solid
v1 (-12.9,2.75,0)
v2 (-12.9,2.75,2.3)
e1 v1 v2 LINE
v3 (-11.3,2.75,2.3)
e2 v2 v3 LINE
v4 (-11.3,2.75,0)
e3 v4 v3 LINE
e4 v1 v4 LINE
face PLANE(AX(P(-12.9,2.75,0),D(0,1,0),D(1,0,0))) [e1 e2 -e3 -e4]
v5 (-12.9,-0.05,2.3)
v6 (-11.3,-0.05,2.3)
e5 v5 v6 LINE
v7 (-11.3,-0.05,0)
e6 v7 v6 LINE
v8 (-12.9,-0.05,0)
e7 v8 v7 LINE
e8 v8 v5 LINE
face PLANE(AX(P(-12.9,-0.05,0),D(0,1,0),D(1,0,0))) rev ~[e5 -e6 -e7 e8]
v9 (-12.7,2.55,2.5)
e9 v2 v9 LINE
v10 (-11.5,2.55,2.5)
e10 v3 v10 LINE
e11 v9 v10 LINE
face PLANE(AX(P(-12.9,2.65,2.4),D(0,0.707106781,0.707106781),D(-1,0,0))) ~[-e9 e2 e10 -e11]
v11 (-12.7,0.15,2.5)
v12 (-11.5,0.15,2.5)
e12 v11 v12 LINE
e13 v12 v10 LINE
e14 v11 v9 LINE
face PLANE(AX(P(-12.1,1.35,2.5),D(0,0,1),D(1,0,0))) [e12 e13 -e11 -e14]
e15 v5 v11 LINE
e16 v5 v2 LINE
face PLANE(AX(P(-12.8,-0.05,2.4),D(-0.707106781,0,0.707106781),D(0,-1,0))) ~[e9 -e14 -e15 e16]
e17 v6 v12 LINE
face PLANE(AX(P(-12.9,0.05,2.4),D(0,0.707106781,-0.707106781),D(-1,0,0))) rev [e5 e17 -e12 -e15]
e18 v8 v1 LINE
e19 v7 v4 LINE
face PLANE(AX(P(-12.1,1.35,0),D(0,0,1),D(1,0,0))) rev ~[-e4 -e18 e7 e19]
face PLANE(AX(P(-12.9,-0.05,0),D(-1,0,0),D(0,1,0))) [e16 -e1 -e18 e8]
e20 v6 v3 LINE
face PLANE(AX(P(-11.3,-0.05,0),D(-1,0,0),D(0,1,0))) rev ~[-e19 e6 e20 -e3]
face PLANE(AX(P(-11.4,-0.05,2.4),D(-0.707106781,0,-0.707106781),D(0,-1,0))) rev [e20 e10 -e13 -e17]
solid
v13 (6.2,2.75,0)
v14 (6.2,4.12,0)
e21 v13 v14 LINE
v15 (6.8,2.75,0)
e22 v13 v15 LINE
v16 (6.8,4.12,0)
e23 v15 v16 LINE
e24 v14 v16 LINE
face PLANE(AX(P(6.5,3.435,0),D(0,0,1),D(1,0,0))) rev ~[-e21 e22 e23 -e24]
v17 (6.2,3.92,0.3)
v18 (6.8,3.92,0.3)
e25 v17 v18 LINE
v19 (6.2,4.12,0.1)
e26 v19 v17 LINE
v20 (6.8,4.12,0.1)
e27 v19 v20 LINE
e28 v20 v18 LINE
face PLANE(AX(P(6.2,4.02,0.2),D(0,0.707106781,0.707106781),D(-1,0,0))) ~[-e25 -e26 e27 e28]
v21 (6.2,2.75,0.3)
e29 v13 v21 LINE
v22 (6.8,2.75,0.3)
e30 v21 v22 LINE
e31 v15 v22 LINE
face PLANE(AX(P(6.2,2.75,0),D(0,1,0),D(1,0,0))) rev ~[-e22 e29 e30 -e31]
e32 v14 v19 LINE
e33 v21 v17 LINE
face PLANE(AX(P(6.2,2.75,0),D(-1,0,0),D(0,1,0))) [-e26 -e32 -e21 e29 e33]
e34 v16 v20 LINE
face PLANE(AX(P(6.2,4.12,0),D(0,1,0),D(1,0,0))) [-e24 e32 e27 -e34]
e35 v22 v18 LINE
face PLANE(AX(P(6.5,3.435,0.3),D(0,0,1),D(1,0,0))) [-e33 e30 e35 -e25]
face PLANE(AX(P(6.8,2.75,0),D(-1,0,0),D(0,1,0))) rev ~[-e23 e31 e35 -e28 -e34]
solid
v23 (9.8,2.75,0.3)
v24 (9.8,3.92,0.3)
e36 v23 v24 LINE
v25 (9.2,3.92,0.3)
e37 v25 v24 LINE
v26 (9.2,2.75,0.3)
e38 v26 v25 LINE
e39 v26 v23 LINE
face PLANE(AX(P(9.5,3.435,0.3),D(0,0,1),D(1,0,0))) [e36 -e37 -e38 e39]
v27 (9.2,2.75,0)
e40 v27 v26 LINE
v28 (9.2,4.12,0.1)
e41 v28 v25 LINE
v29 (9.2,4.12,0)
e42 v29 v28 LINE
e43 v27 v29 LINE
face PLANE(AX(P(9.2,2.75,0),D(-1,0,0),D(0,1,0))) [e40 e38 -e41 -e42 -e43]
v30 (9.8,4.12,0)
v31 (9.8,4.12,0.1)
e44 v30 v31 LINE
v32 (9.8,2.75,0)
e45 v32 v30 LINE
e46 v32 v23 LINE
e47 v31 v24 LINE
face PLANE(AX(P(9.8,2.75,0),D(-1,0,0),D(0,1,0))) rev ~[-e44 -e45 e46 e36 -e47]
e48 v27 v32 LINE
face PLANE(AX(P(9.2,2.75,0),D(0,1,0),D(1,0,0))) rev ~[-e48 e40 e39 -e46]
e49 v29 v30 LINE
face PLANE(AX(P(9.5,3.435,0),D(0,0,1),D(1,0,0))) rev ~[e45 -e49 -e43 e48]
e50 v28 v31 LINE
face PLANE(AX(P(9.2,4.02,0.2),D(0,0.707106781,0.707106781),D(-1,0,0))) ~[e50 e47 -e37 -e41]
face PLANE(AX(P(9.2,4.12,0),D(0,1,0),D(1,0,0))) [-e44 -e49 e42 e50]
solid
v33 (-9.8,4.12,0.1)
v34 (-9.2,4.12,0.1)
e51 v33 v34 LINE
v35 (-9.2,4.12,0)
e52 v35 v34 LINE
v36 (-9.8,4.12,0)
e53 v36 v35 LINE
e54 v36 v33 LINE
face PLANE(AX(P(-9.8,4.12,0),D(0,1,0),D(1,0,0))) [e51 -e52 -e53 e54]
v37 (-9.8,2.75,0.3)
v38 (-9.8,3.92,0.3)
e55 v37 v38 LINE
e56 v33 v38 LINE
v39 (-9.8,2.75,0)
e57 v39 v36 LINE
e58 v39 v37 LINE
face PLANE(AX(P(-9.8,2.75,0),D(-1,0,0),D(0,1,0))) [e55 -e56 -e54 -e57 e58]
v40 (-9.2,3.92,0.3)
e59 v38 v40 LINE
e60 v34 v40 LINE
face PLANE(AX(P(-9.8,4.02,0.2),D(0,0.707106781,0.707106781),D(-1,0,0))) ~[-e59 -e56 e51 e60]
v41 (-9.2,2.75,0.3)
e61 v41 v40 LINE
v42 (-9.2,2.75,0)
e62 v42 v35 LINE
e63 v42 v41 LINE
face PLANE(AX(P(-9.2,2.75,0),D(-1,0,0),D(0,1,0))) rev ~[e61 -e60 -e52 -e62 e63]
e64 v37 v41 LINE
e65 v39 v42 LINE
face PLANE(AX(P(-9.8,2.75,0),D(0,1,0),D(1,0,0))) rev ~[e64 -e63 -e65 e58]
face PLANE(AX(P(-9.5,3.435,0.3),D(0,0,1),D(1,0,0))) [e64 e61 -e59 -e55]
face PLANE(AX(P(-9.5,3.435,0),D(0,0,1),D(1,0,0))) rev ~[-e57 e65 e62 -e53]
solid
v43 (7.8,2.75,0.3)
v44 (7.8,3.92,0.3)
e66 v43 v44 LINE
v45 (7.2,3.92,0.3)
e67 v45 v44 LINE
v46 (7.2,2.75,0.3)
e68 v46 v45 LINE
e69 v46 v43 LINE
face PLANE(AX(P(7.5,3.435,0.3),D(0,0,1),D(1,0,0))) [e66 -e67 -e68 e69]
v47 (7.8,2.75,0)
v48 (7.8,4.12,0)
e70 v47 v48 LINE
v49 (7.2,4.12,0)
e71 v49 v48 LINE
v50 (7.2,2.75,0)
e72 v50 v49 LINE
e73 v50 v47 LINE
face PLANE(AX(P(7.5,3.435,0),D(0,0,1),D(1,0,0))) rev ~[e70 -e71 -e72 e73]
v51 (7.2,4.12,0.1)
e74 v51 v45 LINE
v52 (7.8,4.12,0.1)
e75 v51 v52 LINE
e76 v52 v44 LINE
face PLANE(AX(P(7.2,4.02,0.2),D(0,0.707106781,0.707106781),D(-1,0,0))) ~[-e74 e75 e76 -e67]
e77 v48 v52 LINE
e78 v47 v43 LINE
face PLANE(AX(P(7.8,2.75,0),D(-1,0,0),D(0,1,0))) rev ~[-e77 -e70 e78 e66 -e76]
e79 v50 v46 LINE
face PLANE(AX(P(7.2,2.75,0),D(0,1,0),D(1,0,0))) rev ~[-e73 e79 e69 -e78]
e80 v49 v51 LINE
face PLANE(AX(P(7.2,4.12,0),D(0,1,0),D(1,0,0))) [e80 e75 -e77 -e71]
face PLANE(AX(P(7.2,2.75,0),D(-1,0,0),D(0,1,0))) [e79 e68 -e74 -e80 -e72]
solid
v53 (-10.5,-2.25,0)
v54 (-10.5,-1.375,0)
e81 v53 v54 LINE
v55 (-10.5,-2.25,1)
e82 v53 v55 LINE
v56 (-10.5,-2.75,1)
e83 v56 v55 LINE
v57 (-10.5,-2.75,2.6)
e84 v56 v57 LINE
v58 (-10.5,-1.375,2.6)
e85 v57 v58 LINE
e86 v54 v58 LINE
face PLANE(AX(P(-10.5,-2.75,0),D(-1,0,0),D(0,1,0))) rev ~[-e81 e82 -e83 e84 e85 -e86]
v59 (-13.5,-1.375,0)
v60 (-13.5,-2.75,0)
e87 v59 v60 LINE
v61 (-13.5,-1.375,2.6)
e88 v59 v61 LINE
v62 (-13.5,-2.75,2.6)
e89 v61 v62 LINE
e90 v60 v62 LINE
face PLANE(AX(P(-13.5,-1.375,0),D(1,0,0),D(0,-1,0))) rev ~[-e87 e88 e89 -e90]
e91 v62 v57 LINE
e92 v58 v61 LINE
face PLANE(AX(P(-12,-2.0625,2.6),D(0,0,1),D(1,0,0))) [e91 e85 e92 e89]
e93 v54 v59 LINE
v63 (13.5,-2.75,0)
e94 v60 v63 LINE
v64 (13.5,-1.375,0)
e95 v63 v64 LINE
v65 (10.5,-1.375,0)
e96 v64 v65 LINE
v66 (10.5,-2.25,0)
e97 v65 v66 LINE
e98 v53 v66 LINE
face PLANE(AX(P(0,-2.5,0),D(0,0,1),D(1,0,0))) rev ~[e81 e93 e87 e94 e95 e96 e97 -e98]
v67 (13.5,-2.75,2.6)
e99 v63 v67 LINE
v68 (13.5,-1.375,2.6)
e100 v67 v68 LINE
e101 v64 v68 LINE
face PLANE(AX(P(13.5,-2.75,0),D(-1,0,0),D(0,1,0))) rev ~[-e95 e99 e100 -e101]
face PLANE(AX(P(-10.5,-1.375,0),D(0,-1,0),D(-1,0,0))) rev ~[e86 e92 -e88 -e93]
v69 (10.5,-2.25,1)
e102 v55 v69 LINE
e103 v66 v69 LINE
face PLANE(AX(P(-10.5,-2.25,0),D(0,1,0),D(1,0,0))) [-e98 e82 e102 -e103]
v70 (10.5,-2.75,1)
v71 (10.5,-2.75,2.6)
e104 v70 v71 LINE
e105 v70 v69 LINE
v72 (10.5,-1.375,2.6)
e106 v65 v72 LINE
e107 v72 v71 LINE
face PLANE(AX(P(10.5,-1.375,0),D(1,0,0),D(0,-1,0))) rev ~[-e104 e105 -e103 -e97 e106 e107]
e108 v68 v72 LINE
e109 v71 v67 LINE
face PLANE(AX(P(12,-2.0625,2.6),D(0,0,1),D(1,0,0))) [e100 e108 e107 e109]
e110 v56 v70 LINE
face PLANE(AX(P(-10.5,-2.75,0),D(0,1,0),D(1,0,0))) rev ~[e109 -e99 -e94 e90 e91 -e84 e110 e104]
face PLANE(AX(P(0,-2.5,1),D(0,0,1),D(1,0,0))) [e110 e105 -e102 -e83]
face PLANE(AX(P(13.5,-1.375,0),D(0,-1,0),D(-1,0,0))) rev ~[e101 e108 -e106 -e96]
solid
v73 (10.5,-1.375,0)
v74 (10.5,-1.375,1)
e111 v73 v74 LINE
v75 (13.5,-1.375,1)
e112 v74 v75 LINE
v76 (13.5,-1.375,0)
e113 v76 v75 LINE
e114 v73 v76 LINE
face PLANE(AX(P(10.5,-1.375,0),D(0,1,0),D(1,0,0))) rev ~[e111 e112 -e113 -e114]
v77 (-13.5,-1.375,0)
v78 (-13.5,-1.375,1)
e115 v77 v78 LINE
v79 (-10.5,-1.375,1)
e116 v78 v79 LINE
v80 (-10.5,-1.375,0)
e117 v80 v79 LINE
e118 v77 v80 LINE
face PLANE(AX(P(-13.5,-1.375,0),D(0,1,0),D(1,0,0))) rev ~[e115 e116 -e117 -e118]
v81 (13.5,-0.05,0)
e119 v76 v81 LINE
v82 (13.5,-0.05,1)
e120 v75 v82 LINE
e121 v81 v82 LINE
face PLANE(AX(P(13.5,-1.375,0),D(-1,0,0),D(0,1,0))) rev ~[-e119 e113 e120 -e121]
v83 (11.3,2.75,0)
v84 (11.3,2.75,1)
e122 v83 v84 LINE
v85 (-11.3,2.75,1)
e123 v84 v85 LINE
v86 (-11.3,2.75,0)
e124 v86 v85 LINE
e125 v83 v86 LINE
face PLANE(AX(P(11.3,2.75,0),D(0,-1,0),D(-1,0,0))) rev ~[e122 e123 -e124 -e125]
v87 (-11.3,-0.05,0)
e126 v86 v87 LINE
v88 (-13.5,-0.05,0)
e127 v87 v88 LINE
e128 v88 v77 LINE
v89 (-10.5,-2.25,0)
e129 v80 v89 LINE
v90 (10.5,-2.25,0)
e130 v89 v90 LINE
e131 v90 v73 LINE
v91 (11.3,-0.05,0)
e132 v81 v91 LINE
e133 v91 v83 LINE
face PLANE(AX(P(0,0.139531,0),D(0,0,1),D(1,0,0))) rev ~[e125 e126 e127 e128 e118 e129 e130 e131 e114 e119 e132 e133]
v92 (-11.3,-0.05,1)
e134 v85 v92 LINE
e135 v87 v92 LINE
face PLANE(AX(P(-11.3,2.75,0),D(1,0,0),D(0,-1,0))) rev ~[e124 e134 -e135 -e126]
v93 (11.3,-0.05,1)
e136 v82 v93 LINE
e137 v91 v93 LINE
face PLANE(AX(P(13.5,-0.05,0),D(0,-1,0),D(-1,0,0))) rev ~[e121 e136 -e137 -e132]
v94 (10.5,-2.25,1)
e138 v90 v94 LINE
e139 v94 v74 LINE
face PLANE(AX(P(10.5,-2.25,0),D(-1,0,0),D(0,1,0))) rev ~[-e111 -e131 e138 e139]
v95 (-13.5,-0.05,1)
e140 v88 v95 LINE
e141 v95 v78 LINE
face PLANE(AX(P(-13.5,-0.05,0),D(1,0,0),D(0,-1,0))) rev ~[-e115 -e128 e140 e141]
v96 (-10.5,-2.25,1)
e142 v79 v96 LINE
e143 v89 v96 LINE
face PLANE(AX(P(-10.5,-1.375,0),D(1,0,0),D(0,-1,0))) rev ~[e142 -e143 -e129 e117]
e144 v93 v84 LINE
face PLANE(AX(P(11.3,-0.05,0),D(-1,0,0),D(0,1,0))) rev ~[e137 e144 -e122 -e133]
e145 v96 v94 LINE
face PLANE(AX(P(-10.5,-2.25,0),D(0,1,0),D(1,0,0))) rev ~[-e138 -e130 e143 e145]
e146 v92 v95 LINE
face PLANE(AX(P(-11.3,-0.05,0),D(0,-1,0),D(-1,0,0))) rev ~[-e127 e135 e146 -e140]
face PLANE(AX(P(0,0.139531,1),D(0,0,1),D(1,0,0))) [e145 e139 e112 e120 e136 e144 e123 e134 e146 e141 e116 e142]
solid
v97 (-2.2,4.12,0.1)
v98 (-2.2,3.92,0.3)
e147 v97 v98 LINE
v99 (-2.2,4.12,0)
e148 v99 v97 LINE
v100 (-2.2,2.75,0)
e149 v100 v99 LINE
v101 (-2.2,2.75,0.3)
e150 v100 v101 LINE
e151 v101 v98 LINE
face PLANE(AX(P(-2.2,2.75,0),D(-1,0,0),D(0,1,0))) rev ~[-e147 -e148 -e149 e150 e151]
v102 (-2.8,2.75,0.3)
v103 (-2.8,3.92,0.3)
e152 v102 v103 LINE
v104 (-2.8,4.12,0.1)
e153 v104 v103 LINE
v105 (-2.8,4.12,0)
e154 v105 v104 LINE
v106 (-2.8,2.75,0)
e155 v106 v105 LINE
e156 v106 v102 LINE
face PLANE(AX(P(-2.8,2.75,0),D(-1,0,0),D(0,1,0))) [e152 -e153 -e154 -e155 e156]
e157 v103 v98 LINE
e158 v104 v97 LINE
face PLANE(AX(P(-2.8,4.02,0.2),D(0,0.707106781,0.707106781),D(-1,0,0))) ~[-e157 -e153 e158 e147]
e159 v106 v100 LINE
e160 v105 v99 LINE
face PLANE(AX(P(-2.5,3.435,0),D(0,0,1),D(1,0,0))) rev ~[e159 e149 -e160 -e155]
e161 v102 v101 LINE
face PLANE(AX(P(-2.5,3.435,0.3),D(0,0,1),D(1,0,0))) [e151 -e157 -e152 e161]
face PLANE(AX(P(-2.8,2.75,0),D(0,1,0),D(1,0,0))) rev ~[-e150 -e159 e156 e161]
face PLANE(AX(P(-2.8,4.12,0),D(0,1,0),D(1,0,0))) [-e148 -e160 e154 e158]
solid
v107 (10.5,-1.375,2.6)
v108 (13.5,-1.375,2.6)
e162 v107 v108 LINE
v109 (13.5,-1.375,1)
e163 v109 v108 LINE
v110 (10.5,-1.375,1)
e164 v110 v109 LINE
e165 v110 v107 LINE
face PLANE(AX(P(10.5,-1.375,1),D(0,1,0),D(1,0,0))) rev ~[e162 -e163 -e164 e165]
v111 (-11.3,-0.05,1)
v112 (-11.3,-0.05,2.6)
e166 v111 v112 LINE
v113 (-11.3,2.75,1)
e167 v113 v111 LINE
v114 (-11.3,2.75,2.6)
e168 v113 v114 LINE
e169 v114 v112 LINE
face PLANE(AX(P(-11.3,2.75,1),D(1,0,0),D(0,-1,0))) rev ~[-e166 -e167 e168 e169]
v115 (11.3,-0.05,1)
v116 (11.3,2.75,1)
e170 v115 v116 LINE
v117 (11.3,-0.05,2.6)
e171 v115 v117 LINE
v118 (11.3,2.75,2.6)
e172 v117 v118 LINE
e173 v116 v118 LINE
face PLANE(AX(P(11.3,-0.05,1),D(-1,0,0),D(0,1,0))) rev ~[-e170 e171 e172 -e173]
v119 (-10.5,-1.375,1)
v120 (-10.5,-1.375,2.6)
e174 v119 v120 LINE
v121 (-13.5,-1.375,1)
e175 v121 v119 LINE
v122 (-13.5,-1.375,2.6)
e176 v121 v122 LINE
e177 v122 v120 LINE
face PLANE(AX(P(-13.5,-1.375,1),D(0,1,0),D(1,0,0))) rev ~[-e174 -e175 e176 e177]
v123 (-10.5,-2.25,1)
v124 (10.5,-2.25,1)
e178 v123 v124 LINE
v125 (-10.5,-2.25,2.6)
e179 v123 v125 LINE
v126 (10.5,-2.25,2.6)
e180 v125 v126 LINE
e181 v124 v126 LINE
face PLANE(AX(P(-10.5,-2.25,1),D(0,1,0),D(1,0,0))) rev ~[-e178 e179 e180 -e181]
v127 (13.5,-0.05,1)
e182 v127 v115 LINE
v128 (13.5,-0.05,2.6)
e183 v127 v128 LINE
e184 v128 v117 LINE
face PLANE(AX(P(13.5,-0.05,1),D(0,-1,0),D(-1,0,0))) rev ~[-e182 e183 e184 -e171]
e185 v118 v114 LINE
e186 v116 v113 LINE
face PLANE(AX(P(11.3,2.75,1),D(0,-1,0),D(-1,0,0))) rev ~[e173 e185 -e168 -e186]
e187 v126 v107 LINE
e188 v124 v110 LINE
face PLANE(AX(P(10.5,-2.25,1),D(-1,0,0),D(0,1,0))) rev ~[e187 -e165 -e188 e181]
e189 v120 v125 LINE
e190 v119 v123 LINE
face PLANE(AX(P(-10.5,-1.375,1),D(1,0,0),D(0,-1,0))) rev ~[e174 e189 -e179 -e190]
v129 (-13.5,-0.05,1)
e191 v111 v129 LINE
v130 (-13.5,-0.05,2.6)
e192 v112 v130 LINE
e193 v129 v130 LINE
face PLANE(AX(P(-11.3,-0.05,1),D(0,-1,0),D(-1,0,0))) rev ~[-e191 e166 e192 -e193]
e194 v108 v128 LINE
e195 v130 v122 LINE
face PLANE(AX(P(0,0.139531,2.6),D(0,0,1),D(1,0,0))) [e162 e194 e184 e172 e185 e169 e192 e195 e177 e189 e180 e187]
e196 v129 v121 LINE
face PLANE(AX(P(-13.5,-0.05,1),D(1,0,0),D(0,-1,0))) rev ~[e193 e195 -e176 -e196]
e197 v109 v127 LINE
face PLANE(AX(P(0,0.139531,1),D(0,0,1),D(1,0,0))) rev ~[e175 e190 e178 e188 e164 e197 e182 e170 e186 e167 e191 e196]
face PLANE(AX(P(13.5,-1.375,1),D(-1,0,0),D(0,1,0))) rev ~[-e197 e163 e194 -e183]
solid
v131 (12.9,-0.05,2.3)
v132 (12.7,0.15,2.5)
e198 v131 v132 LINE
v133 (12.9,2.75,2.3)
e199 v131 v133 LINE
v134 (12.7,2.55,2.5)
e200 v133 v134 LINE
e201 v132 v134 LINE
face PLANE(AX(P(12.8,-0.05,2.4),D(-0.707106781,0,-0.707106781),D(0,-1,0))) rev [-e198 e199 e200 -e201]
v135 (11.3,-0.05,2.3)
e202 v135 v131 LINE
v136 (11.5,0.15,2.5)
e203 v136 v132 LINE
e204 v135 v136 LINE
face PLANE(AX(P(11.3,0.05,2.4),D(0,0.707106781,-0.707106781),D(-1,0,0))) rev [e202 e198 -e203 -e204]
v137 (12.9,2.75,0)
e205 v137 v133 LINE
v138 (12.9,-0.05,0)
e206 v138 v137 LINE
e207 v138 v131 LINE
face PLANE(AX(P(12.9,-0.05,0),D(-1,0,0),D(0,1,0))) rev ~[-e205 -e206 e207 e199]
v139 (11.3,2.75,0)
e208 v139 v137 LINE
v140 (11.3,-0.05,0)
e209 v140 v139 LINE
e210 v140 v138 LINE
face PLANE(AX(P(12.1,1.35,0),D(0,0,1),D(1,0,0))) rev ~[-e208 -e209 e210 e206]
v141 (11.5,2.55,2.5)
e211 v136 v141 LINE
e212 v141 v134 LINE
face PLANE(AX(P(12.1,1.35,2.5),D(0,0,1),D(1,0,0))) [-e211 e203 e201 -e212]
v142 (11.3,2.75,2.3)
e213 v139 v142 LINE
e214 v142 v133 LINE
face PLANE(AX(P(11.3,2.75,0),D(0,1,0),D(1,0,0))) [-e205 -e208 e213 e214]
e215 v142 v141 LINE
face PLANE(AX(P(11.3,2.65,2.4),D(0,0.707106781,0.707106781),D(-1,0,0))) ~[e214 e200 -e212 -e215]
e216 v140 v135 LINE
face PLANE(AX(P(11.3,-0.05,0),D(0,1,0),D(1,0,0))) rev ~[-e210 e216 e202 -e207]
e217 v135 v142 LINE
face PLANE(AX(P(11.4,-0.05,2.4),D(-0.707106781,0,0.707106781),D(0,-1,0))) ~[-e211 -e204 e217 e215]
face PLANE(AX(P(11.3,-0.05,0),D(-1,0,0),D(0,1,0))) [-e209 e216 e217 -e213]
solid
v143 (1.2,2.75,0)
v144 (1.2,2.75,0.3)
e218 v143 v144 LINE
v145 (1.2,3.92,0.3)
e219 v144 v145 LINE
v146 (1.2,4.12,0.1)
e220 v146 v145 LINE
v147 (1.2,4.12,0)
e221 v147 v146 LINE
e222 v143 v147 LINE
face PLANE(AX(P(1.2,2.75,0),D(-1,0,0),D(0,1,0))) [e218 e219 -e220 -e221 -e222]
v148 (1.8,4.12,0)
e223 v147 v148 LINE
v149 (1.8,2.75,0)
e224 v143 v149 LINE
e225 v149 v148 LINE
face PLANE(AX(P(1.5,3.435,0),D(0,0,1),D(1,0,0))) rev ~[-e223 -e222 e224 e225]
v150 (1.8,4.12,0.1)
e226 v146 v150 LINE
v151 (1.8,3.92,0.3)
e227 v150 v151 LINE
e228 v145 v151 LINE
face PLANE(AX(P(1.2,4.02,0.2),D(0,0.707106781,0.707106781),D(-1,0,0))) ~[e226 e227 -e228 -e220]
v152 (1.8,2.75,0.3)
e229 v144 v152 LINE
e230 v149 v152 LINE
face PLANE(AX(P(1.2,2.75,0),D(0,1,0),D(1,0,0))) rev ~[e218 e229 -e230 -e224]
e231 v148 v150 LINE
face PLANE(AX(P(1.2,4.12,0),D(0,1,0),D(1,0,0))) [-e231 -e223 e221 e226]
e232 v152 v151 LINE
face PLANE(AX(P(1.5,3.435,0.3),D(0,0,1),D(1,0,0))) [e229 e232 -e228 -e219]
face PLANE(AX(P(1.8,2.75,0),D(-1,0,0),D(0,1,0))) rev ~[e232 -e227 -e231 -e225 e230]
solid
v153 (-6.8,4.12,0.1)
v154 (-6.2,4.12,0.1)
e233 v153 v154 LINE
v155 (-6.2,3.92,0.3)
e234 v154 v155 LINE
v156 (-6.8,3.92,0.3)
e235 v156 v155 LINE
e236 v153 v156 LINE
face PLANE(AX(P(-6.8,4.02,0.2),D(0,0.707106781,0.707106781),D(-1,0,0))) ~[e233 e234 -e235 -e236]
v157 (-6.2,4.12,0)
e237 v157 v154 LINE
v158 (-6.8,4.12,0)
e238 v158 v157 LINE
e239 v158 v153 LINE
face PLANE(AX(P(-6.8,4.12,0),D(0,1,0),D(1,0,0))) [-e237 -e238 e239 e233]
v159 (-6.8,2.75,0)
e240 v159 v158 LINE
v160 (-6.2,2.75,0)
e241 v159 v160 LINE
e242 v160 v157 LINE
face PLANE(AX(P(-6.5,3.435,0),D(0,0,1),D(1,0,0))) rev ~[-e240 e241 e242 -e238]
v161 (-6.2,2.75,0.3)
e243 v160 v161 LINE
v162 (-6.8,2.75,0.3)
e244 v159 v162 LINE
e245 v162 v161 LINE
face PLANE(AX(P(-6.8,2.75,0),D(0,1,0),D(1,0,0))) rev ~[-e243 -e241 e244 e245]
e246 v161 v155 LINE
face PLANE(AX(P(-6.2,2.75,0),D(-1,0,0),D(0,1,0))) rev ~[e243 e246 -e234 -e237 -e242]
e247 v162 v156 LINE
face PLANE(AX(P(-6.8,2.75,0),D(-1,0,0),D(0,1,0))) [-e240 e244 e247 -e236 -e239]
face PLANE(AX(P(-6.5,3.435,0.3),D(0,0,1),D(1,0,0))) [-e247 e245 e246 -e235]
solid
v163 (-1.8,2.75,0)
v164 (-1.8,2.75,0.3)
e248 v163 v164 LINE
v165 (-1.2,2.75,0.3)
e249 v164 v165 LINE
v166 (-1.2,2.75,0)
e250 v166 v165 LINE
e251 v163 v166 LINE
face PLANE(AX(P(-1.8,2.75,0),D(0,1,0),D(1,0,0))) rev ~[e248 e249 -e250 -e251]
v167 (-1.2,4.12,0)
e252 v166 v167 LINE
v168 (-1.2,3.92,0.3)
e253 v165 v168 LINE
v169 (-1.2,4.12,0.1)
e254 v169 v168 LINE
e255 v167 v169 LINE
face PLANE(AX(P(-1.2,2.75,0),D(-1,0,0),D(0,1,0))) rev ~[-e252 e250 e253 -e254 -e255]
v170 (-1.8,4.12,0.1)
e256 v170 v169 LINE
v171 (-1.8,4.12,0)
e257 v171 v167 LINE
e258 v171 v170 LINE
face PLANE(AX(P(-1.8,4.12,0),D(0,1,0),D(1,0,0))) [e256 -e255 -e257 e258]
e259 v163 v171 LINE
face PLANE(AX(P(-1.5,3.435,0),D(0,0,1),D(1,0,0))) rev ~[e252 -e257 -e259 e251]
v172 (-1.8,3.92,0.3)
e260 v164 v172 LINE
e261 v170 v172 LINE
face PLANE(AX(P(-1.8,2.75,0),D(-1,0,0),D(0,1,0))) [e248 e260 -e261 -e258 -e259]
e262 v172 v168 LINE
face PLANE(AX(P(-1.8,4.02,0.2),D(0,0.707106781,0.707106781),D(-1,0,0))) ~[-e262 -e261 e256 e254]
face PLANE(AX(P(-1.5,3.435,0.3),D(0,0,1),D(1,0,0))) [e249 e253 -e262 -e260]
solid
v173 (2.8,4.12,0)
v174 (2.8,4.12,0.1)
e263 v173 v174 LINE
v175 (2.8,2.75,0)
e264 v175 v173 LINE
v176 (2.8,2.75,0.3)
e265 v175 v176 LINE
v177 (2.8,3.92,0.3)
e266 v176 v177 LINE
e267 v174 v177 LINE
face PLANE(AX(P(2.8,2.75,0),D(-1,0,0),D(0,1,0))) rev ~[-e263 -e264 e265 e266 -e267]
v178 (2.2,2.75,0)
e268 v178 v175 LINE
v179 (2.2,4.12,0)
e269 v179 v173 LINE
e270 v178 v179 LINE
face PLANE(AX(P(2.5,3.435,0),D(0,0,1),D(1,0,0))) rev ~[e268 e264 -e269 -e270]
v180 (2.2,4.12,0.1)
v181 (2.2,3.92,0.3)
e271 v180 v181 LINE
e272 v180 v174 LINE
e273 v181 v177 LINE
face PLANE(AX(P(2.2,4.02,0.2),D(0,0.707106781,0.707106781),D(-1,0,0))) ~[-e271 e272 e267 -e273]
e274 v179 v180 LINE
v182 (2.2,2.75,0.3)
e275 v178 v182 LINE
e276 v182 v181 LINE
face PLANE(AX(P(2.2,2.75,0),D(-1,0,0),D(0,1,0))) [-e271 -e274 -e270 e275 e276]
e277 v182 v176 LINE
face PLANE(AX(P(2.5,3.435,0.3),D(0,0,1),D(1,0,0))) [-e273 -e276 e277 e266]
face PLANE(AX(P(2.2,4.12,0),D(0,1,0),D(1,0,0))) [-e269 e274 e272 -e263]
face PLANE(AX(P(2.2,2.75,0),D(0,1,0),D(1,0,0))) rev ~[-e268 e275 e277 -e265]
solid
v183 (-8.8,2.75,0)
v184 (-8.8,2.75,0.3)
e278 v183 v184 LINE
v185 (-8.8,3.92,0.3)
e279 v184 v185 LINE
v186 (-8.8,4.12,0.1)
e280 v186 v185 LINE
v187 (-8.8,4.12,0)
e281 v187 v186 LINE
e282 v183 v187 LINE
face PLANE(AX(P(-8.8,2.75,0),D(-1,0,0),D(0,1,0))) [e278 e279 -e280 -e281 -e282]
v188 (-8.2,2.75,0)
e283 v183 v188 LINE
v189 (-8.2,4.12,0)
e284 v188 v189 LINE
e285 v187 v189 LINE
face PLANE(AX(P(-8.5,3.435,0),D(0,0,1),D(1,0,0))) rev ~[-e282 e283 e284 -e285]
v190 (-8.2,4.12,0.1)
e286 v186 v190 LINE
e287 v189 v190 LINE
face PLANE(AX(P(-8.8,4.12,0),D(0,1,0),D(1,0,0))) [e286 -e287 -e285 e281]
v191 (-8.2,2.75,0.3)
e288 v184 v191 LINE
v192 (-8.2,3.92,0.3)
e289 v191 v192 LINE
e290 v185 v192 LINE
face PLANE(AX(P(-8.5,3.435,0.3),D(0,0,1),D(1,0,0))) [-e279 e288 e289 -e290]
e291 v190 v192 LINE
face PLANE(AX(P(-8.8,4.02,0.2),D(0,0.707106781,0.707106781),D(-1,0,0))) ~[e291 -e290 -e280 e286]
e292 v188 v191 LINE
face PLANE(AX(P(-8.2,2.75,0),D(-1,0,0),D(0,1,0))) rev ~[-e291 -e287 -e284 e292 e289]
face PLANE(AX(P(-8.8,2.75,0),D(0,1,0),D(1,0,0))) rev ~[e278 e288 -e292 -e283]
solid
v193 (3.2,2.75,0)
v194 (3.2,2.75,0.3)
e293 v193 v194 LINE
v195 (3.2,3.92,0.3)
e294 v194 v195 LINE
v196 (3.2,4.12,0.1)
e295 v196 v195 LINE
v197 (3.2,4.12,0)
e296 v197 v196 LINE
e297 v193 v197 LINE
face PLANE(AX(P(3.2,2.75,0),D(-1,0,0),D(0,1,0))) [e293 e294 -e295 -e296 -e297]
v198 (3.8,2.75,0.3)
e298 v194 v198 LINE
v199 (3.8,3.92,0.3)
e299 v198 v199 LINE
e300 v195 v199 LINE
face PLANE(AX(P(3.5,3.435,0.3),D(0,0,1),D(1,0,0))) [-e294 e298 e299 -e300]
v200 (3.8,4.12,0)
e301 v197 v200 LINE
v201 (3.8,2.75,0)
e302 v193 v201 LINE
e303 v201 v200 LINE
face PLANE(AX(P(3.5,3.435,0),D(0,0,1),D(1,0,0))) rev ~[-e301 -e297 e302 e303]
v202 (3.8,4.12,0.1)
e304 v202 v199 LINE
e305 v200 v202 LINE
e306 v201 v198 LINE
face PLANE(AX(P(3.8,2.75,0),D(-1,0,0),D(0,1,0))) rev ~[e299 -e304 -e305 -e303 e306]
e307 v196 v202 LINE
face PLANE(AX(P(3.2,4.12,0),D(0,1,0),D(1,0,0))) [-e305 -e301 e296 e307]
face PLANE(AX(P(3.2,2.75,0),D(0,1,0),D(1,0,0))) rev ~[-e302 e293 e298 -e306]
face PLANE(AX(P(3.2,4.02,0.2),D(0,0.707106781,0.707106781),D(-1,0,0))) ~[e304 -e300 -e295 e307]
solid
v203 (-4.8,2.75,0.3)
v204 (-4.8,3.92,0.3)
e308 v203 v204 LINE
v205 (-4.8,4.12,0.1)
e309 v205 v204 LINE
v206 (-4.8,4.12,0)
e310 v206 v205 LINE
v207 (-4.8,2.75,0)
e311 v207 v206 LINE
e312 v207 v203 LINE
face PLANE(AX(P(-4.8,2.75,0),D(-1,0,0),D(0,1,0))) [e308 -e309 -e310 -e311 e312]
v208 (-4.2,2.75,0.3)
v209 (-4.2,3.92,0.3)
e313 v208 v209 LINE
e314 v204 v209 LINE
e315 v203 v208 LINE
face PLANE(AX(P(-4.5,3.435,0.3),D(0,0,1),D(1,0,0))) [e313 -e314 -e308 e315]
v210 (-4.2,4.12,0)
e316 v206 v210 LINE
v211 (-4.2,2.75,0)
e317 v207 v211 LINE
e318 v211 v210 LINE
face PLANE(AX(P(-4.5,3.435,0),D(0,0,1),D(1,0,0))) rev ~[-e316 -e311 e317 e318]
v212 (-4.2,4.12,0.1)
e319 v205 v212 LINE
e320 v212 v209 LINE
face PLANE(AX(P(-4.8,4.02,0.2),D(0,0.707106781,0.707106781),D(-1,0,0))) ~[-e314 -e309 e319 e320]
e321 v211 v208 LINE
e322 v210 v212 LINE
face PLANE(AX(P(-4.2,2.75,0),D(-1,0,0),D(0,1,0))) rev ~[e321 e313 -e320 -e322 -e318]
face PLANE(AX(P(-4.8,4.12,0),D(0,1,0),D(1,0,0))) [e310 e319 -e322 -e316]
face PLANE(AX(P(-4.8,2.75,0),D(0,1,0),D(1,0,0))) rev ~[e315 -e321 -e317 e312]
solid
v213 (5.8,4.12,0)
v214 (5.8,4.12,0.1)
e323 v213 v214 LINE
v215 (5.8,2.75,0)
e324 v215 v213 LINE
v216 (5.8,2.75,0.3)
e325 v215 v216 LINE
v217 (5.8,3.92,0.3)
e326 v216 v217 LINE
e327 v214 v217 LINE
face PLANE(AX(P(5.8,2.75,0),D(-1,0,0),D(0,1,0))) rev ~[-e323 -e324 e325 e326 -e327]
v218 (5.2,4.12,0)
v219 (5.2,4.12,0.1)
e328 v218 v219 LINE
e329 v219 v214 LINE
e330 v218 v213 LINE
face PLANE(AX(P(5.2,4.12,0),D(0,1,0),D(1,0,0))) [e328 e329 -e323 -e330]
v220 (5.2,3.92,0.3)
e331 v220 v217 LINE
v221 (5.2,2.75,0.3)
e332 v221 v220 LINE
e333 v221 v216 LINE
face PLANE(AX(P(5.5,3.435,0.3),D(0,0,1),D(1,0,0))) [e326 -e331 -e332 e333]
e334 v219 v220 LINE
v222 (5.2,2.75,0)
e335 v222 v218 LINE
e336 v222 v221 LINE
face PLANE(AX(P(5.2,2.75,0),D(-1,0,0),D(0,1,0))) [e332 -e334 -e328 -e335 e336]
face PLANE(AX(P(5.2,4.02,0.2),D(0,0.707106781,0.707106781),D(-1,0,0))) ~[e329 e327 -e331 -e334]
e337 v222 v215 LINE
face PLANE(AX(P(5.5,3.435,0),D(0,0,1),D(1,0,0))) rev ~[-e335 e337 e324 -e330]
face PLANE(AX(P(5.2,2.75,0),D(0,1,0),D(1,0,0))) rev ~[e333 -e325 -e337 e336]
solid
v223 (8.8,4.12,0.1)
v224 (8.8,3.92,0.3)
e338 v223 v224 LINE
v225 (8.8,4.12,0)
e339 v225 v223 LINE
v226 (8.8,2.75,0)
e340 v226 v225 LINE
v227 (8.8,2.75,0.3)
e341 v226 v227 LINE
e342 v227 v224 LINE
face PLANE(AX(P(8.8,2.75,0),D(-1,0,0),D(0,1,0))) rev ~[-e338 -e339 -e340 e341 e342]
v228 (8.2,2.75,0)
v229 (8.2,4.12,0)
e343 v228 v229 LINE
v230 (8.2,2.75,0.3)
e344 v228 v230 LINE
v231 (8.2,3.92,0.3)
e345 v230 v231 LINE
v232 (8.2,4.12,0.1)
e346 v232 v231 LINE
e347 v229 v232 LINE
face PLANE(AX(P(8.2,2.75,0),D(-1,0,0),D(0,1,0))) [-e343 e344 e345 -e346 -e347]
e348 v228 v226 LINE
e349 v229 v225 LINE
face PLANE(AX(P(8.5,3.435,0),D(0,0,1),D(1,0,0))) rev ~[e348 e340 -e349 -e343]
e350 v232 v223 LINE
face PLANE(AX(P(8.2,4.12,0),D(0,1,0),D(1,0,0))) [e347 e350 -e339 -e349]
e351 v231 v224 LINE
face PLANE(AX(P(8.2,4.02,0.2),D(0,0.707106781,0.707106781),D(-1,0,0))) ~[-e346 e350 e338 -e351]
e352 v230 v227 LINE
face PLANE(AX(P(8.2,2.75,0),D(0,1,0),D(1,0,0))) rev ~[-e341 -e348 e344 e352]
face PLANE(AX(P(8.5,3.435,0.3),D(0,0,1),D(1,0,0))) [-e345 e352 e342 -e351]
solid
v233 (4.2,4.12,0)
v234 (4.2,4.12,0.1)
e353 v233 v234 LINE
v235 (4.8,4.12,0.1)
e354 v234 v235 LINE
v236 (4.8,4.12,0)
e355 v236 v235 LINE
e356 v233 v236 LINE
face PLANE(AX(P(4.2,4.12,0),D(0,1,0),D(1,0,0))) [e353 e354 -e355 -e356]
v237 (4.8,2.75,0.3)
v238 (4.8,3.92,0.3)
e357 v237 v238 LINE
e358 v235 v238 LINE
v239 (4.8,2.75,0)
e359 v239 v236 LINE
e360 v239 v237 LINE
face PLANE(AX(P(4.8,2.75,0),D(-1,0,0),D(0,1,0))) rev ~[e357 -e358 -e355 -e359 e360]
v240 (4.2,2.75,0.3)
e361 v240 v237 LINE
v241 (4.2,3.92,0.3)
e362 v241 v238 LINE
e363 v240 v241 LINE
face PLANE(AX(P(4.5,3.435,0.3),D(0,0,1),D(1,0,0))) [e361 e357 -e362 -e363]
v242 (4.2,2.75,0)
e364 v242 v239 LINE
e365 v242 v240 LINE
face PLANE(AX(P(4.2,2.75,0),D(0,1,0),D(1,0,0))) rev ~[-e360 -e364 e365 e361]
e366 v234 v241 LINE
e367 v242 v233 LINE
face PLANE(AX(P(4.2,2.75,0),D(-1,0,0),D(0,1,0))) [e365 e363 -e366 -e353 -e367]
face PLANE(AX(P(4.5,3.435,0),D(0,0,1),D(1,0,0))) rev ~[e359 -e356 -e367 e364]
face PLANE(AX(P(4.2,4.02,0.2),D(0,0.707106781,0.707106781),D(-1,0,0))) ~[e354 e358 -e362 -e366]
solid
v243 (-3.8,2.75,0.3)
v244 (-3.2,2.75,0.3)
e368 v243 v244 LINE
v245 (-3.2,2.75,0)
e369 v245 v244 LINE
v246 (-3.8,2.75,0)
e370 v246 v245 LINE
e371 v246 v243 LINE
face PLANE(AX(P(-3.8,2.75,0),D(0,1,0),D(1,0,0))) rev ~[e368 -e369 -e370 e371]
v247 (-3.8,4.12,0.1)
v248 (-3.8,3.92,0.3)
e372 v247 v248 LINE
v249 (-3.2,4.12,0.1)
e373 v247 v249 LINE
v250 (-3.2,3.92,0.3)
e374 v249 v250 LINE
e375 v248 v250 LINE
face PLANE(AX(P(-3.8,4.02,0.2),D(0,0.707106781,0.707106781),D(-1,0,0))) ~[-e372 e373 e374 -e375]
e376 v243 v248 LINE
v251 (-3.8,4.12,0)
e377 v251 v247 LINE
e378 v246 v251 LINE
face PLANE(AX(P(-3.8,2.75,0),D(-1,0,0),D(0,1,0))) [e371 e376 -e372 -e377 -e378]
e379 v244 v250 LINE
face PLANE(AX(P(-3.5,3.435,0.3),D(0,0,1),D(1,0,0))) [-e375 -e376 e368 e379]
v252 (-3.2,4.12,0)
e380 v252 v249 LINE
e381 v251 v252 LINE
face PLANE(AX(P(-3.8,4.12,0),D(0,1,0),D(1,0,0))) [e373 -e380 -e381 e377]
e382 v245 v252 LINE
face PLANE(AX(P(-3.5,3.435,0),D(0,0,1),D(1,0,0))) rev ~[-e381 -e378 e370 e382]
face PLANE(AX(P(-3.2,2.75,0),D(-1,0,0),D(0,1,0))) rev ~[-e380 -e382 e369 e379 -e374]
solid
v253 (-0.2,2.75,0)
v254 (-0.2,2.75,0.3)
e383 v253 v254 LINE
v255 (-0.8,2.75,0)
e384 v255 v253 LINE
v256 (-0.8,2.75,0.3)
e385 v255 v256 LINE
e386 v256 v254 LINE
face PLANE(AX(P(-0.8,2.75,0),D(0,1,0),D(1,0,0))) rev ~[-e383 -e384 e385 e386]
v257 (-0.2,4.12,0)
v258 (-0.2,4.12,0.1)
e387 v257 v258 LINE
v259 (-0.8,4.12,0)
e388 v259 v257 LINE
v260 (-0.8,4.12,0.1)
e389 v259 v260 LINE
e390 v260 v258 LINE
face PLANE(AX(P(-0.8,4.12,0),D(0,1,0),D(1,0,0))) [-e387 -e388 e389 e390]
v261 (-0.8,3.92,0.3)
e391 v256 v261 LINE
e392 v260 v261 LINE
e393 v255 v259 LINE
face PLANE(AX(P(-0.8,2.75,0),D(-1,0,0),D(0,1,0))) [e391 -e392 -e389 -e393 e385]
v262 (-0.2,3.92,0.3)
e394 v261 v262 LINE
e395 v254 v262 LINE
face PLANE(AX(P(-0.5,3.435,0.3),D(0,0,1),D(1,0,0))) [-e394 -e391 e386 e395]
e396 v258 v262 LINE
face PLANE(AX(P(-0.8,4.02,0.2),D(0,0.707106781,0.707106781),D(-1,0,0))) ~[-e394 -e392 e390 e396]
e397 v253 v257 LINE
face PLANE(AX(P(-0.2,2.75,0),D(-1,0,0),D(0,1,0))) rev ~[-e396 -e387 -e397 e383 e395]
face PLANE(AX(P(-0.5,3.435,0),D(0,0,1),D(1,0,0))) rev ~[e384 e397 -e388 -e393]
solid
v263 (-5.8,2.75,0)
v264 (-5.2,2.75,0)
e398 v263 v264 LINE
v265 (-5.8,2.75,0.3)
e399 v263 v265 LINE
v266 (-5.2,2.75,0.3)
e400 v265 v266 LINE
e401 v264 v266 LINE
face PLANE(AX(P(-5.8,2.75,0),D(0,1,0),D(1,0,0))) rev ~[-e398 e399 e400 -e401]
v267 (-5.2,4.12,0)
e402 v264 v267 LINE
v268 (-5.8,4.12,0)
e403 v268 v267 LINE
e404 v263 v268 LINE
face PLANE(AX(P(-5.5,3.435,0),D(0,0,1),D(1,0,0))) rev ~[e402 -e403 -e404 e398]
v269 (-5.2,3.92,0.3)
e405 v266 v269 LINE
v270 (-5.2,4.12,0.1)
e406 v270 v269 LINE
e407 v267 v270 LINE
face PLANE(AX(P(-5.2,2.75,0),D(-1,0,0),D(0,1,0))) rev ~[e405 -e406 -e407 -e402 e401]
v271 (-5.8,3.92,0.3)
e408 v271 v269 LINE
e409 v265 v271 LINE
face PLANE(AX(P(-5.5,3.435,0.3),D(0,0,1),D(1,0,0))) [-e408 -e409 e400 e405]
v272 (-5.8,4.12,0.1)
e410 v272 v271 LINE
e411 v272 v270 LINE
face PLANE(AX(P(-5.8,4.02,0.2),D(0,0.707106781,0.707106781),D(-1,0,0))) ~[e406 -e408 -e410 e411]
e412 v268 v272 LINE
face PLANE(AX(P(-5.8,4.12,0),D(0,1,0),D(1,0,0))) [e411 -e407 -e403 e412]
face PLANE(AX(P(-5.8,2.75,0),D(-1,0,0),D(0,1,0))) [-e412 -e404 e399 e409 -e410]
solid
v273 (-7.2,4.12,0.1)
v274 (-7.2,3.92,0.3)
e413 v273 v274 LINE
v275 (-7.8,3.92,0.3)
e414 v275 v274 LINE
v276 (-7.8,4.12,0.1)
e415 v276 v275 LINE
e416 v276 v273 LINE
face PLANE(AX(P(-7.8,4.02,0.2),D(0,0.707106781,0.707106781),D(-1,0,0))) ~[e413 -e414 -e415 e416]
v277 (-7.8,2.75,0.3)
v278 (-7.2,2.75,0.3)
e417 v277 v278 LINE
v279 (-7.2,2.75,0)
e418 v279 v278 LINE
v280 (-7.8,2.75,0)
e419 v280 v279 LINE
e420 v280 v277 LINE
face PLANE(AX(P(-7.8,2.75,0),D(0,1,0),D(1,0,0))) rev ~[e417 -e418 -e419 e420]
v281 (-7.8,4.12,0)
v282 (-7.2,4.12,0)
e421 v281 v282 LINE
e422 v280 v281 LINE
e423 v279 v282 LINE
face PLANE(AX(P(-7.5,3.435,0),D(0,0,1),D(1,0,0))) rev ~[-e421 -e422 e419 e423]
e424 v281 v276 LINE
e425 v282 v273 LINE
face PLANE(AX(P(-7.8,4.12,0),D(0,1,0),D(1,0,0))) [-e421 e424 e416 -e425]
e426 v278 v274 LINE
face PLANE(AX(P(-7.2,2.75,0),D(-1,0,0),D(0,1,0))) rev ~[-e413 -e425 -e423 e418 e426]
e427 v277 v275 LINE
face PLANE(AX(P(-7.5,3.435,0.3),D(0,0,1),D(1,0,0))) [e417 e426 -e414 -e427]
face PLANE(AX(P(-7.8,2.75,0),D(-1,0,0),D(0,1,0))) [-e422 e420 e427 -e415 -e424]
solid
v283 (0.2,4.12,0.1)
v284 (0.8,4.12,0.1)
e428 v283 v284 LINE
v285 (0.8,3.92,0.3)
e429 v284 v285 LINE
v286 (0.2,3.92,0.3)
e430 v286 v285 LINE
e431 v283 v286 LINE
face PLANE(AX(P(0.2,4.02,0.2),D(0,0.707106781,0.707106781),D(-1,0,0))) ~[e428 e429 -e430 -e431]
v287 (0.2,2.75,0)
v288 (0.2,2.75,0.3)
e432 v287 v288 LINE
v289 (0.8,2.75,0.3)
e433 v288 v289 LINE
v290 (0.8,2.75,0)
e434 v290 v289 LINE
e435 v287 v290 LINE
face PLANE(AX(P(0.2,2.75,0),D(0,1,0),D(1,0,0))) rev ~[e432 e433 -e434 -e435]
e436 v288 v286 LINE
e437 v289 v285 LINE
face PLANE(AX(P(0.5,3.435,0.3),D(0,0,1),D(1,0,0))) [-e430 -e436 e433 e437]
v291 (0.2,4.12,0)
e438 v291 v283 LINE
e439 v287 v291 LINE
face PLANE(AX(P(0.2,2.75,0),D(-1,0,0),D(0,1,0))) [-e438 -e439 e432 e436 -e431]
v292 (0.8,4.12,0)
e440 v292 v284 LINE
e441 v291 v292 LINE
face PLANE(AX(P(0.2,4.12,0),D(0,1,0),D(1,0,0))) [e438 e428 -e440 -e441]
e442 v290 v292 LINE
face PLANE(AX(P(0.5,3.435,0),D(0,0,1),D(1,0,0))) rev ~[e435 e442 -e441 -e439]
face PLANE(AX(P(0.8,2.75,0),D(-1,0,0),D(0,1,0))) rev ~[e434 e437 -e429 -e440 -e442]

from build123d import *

# Parameters (mm, degrees)
F1_DEPTH   = 1
F2_DEPTH   = 2.6
F0_W       = 21
F0_H       = 0.5
F3_DEPTH   = 1
F5_DEPTH   = 1.6
F0_W_2     = 1.6
F0_H_2     = 2.8
F6_DEPTH   = 2.5
F0_W_3     = 0.6
F0_H_3     = 1.37
F7_DEPTH   = 0.3
F8_SIZE    = 0.2
F8_2_SIZE  = 0.2
F8_3_SIZE  = 0.2
F8_4_SIZE  = 0.2
F8_5_SIZE  = 0.2
F8_6_SIZE  = 0.2
F8_7_SIZE  = 0.2
F8_8_SIZE  = 0.2
F8_9_SIZE  = 0.2
F8_10_SIZE = 0.2
F8_11_SIZE = 0.2
F8_12_SIZE = 0.2
F8_13_SIZE = 0.2
F8_14_SIZE = 0.2
F8_15_SIZE = 0.2
F8_16_SIZE = 0.2
F8_17_SIZE = 0.2
F8_18_SIZE = 0.2
F8_19_SIZE = 0.2
F8_20_SIZE = 0.2
F9_SIZE    = 0.2
F9_2_SIZE  = 0.2


with BuildPart() as f1:
    # F0 (on Top) → F1 (new body)
    with BuildSketch(Plane.XY):
        Polygon((-9.8, 2.75), (-11.3, 2.75), (-11.3, -0.05), (-12.9, -0.05), (-13.5, -0.05), (-13.5, -1.375), (-10.5, -1.375), (-10.5, -2.25), (10.5, -2.25), (10.5, -1.375), (13.5, -1.375), (13.5, -0.05), (12.9, -0.05), (11.3, -0.05), (11.3, 2.75), (9.8, 2.75), (9.2, 2.75), (8.8, 2.75), (8.2, 2.75), (7.8, 2.75), (7.2, 2.75), (6.8, 2.75), (6.2, 2.75), (5.8, 2.75), (5.2, 2.75), (4.8, 2.75), (4.2, 2.75), (3.8, 2.75), (3.2, 2.75), (2.8, 2.75), (2.2, 2.75), (1.8, 2.75), (1.2, 2.75), (0.8, 2.75), (0.2, 2.75), (-0.2, 2.75), (-0.8, 2.75), (-1.2, 2.75), (-1.8, 2.75), (-2.2, 2.75), (-2.8, 2.75), (-3.2, 2.75), (-3.8, 2.75), (-4.2, 2.75), (-4.8, 2.75), (-5.2, 2.75), (-5.8, 2.75), (-6.2, 2.75), (-6.8, 2.75), (-7.2, 2.75), (-7.8, 2.75), (-8.2, 2.75), (-8.8, 2.75), (-9.2, 2.75), align=None)
    extrude(amount=F1_DEPTH)


with BuildPart() as f2:
    # F0 (on Top) → F2 (new body)
    with BuildSketch(Plane.XY):
        Polygon((-10.5, -1.375), (-13.5, -1.375), (-13.5, -2.75), (-10.5, -2.75), (-10.5, -2.25), align=None)
    extrude(amount=F2_DEPTH)



with BuildPart() as f2b:
    # F0 (on Top) → F2, piece 2 (new body)
    with BuildSketch(Plane.XY):
        Polygon((10.5, -2.25), (10.5, -2.75), (13.5, -2.75), (13.5, -1.375), (10.5, -1.375), align=None)
    extrude(amount=F2_DEPTH)


with BuildPart() as f2_1:
    add(f2.part)

    add(f2b.part)  # F3 merges F2b
    # F0 (on Top) → F3 (join)
    with BuildSketch(Plane.XY):
        with Locations((0, -2.5)):
            Rectangle(F0_W, F0_H)
    extrude(amount=F3_DEPTH)


with BuildPart() as f5:
    # F5 (new): a face of the model
    f5_faces = [f1.part.faces().sort_by_distance(p)[0] for p in [
        (0, 0.2268042664, 1),
    ]]
    extrude(f5_faces, amount=F5_DEPTH)


with BuildPart() as f6:
    # F0 (on Top) → F6 (new body)
    with BuildSketch(Plane.XY):
        with Locations((-12.1, 1.35)):
            Rectangle(F0_W_2, F0_H_2)
    extrude(amount=F6_DEPTH)

    # F9
    f9_edges = [f6.edges().sort_by_distance(p)[0] for p in [
        (-12.1, 2.75, 2.5),
        (-12.9, 1.35, 2.5),
        (-11.3, 1.35, 2.5),
        (-12.1, -0.05, 2.5),
    ]]
    chamfer(f9_edges, length=F9_SIZE)


with BuildPart() as f6b:
    # F0 (on Top) → F6, piece 2 (new body)
    with BuildSketch(Plane.XY):
        with Locations((12.1, 1.35)):
            Rectangle(F0_W_2, F0_H_2)
    extrude(amount=F6_DEPTH)

    # F9#2
    f9_2_edges = [f6b.edges().sort_by_distance(p)[0] for p in [
        (12.1, 2.75, 2.5),
        (12.9, 1.35, 2.5),
        (11.3, 1.35, 2.5),
        (12.1, -0.05, 2.5),
    ]]
    chamfer(f9_2_edges, length=F9_2_SIZE)


with BuildPart() as f7:
    # F0 (on Top) → F7 (new body)
    with BuildSketch(Plane.XY):
        with Locations((-9.5, 3.435)):
            Rectangle(F0_W_3, F0_H_3)
    extrude(amount=F7_DEPTH)

    # F8
    f8_edges = [f7.edges().sort_by_distance(p)[0] for p in [
        (-9.5, 4.12, 0.3),
    ]]
    chamfer(f8_edges, length=F8_SIZE)


with BuildPart() as f7b:
    # F0 (on Top) → F7, piece 2 (new body)
    with BuildSketch(Plane.XY):
        with Locations((-8.5, 3.435)):
            Rectangle(F0_W_3, F0_H_3)
    extrude(amount=F7_DEPTH)

    # F8#2
    f8_2_edges = [f7b.edges().sort_by_distance(p)[0] for p in [
        (-8.5, 4.12, 0.3),
    ]]
    chamfer(f8_2_edges, length=F8_2_SIZE)


with BuildPart() as f7c:
    # F0 (on Top) → F7, piece 3 (new body)
    with BuildSketch(Plane.XY):
        with Locations((-7.5, 3.435)):
            Rectangle(F0_W_3, F0_H_3)
    extrude(amount=F7_DEPTH)

    # F8#3
    f8_3_edges = [f7c.edges().sort_by_distance(p)[0] for p in [
        (-7.5, 4.12, 0.3),
    ]]
    chamfer(f8_3_edges, length=F8_3_SIZE)


with BuildPart() as f7d:
    # F0 (on Top) → F7, piece 4 (new body)
    with BuildSketch(Plane.XY):
        with Locations((-6.5, 3.435)):
            Rectangle(F0_W_3, F0_H_3)
    extrude(amount=F7_DEPTH)

    # F8#4
    f8_4_edges = [f7d.edges().sort_by_distance(p)[0] for p in [
        (-6.5, 4.12, 0.3),
    ]]
    chamfer(f8_4_edges, length=F8_4_SIZE)


with BuildPart() as f7e:
    # F0 (on Top) → F7, piece 5 (new body)
    with BuildSketch(Plane.XY):
        with Locations((-5.5, 3.435)):
            Rectangle(F0_W_3, F0_H_3)
    extrude(amount=F7_DEPTH)

    # F8#5
    f8_5_edges = [f7e.edges().sort_by_distance(p)[0] for p in [
        (-5.5, 4.12, 0.3),
    ]]
    chamfer(f8_5_edges, length=F8_5_SIZE)


with BuildPart() as f7f:
    # F0 (on Top) → F7, piece 6 (new body)
    with BuildSketch(Plane.XY):
        with Locations((-4.5, 3.435)):
            Rectangle(F0_W_3, F0_H_3)
    extrude(amount=F7_DEPTH)

    # F8#6
    f8_6_edges = [f7f.edges().sort_by_distance(p)[0] for p in [
        (-4.5, 4.12, 0.3),
    ]]
    chamfer(f8_6_edges, length=F8_6_SIZE)


with BuildPart() as f7g:
    # F0 (on Top) → F7, piece 7 (new body)
    with BuildSketch(Plane.XY):
        with Locations((-3.5, 3.435)):
            Rectangle(F0_W_3, F0_H_3)
    extrude(amount=F7_DEPTH)

    # F8#7
    f8_7_edges = [f7g.edges().sort_by_distance(p)[0] for p in [
        (-3.5, 4.12, 0.3),
    ]]
    chamfer(f8_7_edges, length=F8_7_SIZE)


with BuildPart() as f7h:
    # F0 (on Top) → F7, piece 8 (new body)
    with BuildSketch(Plane.XY):
        with Locations((-2.5, 3.435)):
            Rectangle(F0_W_3, F0_H_3)
    extrude(amount=F7_DEPTH)

    # F8#8
    f8_8_edges = [f7h.edges().sort_by_distance(p)[0] for p in [
        (-2.5, 4.12, 0.3),
    ]]
    chamfer(f8_8_edges, length=F8_8_SIZE)


with BuildPart() as f7i:
    # F0 (on Top) → F7, piece 9 (new body)
    with BuildSketch(Plane.XY):
        with Locations((-1.5, 3.435)):
            Rectangle(F0_W_3, F0_H_3)
    extrude(amount=F7_DEPTH)

    # F8#9
    f8_9_edges = [f7i.edges().sort_by_distance(p)[0] for p in [
        (-1.5, 4.12, 0.3),
    ]]
    chamfer(f8_9_edges, length=F8_9_SIZE)


with BuildPart() as f7j:
    # F0 (on Top) → F7, piece 10 (new body)
    with BuildSketch(Plane.XY):
        with Locations((-0.5, 3.435)):
            Rectangle(F0_W_3, F0_H_3)
    extrude(amount=F7_DEPTH)

    # F8#10
    f8_10_edges = [f7j.edges().sort_by_distance(p)[0] for p in [
        (-0.5, 4.12, 0.3),
    ]]
    chamfer(f8_10_edges, length=F8_10_SIZE)


with BuildPart() as f7k:
    # F0 (on Top) → F7, piece 11 (new body)
    with BuildSketch(Plane.XY):
        with Locations((0.5, 3.435)):
            Rectangle(F0_W_3, F0_H_3)
    extrude(amount=F7_DEPTH)

    # F8#11
    f8_11_edges = [f7k.edges().sort_by_distance(p)[0] for p in [
        (0.5, 4.12, 0.3),
    ]]
    chamfer(f8_11_edges, length=F8_11_SIZE)


with BuildPart() as f7l:
    # F0 (on Top) → F7, piece 12 (new body)
    with BuildSketch(Plane.XY):
        with Locations((1.5, 3.435)):
            Rectangle(F0_W_3, F0_H_3)
    extrude(amount=F7_DEPTH)

    # F8#12
    f8_12_edges = [f7l.edges().sort_by_distance(p)[0] for p in [
        (1.5, 4.12, 0.3),
    ]]
    chamfer(f8_12_edges, length=F8_12_SIZE)


with BuildPart() as f7m:
    # F0 (on Top) → F7, piece 13 (new body)
    with BuildSketch(Plane.XY):
        with Locations((2.5, 3.435)):
            Rectangle(F0_W_3, F0_H_3)
    extrude(amount=F7_DEPTH)

    # F8#13
    f8_13_edges = [f7m.edges().sort_by_distance(p)[0] for p in [
        (2.5, 4.12, 0.3),
    ]]
    chamfer(f8_13_edges, length=F8_13_SIZE)


with BuildPart() as f7n:
    # F0 (on Top) → F7, piece 14 (new body)
    with BuildSketch(Plane.XY):
        with Locations((3.5, 3.435)):
            Rectangle(F0_W_3, F0_H_3)
    extrude(amount=F7_DEPTH)

    # F8#14
    f8_14_edges = [f7n.edges().sort_by_distance(p)[0] for p in [
        (3.5, 4.12, 0.3),
    ]]
    chamfer(f8_14_edges, length=F8_14_SIZE)


with BuildPart() as f7o:
    # F0 (on Top) → F7, piece 15 (new body)
    with BuildSketch(Plane.XY):
        with Locations((4.5, 3.435)):
            Rectangle(F0_W_3, F0_H_3)
    extrude(amount=F7_DEPTH)

    # F8#15
    f8_15_edges = [f7o.edges().sort_by_distance(p)[0] for p in [
        (4.5, 4.12, 0.3),
    ]]
    chamfer(f8_15_edges, length=F8_15_SIZE)


with BuildPart() as f7p:
    # F0 (on Top) → F7, piece 16 (new body)
    with BuildSketch(Plane.XY):
        with Locations((5.5, 3.435)):
            Rectangle(F0_W_3, F0_H_3)
    extrude(amount=F7_DEPTH)

    # F8#16
    f8_16_edges = [f7p.edges().sort_by_distance(p)[0] for p in [
        (5.5, 4.12, 0.3),
    ]]
    chamfer(f8_16_edges, length=F8_16_SIZE)


with BuildPart() as f7q:
    # F0 (on Top) → F7, piece 17 (new body)
    with BuildSketch(Plane.XY):
        with Locations((6.5, 3.435)):
            Rectangle(F0_W_3, F0_H_3)
    extrude(amount=F7_DEPTH)

    # F8#17
    f8_17_edges = [f7q.edges().sort_by_distance(p)[0] for p in [
        (6.5, 4.12, 0.3),
    ]]
    chamfer(f8_17_edges, length=F8_17_SIZE)


with BuildPart() as f7r:
    # F0 (on Top) → F7, piece 18 (new body)
    with BuildSketch(Plane.XY):
        with Locations((7.5, 3.435)):
            Rectangle(F0_W_3, F0_H_3)
    extrude(amount=F7_DEPTH)

    # F8#18
    f8_18_edges = [f7r.edges().sort_by_distance(p)[0] for p in [
        (7.5, 4.12, 0.3),
    ]]
    chamfer(f8_18_edges, length=F8_18_SIZE)


with BuildPart() as f7s:
    # F0 (on Top) → F7, piece 19 (new body)
    with BuildSketch(Plane.XY):
        with Locations((8.5, 3.435)):
            Rectangle(F0_W_3, F0_H_3)
    extrude(amount=F7_DEPTH)

    # F8#19
    f8_19_edges = [f7s.edges().sort_by_distance(p)[0] for p in [
        (8.5, 4.12, 0.3),
    ]]
    chamfer(f8_19_edges, length=F8_19_SIZE)


with BuildPart() as f7t:
    # F0 (on Top) → F7, piece 20 (new body)
    with BuildSketch(Plane.XY):
        with Locations((9.5, 3.435)):
            Rectangle(F0_W_3, F0_H_3)
    extrude(amount=F7_DEPTH)

    # F8#20
    f8_20_edges = [f7t.edges().sort_by_distance(p)[0] for p in [
        (9.5, 4.12, 0.3),
    ]]
    chamfer(f8_20_edges, length=F8_20_SIZE)


solid = Compound([f1.part, f2_1.part, f5.part, f6.part, f6b.part, f7.part, f7b.part, f7c.part, f7d.part, f7e.part, f7f.part, f7g.part, f7h.part, f7i.part, f7j.part, f7k.part, f7l.part, f7m.part, f7n.part, f7o.part, f7p.part, f7q.part, f7r.part, f7s.part, f7t.part])
